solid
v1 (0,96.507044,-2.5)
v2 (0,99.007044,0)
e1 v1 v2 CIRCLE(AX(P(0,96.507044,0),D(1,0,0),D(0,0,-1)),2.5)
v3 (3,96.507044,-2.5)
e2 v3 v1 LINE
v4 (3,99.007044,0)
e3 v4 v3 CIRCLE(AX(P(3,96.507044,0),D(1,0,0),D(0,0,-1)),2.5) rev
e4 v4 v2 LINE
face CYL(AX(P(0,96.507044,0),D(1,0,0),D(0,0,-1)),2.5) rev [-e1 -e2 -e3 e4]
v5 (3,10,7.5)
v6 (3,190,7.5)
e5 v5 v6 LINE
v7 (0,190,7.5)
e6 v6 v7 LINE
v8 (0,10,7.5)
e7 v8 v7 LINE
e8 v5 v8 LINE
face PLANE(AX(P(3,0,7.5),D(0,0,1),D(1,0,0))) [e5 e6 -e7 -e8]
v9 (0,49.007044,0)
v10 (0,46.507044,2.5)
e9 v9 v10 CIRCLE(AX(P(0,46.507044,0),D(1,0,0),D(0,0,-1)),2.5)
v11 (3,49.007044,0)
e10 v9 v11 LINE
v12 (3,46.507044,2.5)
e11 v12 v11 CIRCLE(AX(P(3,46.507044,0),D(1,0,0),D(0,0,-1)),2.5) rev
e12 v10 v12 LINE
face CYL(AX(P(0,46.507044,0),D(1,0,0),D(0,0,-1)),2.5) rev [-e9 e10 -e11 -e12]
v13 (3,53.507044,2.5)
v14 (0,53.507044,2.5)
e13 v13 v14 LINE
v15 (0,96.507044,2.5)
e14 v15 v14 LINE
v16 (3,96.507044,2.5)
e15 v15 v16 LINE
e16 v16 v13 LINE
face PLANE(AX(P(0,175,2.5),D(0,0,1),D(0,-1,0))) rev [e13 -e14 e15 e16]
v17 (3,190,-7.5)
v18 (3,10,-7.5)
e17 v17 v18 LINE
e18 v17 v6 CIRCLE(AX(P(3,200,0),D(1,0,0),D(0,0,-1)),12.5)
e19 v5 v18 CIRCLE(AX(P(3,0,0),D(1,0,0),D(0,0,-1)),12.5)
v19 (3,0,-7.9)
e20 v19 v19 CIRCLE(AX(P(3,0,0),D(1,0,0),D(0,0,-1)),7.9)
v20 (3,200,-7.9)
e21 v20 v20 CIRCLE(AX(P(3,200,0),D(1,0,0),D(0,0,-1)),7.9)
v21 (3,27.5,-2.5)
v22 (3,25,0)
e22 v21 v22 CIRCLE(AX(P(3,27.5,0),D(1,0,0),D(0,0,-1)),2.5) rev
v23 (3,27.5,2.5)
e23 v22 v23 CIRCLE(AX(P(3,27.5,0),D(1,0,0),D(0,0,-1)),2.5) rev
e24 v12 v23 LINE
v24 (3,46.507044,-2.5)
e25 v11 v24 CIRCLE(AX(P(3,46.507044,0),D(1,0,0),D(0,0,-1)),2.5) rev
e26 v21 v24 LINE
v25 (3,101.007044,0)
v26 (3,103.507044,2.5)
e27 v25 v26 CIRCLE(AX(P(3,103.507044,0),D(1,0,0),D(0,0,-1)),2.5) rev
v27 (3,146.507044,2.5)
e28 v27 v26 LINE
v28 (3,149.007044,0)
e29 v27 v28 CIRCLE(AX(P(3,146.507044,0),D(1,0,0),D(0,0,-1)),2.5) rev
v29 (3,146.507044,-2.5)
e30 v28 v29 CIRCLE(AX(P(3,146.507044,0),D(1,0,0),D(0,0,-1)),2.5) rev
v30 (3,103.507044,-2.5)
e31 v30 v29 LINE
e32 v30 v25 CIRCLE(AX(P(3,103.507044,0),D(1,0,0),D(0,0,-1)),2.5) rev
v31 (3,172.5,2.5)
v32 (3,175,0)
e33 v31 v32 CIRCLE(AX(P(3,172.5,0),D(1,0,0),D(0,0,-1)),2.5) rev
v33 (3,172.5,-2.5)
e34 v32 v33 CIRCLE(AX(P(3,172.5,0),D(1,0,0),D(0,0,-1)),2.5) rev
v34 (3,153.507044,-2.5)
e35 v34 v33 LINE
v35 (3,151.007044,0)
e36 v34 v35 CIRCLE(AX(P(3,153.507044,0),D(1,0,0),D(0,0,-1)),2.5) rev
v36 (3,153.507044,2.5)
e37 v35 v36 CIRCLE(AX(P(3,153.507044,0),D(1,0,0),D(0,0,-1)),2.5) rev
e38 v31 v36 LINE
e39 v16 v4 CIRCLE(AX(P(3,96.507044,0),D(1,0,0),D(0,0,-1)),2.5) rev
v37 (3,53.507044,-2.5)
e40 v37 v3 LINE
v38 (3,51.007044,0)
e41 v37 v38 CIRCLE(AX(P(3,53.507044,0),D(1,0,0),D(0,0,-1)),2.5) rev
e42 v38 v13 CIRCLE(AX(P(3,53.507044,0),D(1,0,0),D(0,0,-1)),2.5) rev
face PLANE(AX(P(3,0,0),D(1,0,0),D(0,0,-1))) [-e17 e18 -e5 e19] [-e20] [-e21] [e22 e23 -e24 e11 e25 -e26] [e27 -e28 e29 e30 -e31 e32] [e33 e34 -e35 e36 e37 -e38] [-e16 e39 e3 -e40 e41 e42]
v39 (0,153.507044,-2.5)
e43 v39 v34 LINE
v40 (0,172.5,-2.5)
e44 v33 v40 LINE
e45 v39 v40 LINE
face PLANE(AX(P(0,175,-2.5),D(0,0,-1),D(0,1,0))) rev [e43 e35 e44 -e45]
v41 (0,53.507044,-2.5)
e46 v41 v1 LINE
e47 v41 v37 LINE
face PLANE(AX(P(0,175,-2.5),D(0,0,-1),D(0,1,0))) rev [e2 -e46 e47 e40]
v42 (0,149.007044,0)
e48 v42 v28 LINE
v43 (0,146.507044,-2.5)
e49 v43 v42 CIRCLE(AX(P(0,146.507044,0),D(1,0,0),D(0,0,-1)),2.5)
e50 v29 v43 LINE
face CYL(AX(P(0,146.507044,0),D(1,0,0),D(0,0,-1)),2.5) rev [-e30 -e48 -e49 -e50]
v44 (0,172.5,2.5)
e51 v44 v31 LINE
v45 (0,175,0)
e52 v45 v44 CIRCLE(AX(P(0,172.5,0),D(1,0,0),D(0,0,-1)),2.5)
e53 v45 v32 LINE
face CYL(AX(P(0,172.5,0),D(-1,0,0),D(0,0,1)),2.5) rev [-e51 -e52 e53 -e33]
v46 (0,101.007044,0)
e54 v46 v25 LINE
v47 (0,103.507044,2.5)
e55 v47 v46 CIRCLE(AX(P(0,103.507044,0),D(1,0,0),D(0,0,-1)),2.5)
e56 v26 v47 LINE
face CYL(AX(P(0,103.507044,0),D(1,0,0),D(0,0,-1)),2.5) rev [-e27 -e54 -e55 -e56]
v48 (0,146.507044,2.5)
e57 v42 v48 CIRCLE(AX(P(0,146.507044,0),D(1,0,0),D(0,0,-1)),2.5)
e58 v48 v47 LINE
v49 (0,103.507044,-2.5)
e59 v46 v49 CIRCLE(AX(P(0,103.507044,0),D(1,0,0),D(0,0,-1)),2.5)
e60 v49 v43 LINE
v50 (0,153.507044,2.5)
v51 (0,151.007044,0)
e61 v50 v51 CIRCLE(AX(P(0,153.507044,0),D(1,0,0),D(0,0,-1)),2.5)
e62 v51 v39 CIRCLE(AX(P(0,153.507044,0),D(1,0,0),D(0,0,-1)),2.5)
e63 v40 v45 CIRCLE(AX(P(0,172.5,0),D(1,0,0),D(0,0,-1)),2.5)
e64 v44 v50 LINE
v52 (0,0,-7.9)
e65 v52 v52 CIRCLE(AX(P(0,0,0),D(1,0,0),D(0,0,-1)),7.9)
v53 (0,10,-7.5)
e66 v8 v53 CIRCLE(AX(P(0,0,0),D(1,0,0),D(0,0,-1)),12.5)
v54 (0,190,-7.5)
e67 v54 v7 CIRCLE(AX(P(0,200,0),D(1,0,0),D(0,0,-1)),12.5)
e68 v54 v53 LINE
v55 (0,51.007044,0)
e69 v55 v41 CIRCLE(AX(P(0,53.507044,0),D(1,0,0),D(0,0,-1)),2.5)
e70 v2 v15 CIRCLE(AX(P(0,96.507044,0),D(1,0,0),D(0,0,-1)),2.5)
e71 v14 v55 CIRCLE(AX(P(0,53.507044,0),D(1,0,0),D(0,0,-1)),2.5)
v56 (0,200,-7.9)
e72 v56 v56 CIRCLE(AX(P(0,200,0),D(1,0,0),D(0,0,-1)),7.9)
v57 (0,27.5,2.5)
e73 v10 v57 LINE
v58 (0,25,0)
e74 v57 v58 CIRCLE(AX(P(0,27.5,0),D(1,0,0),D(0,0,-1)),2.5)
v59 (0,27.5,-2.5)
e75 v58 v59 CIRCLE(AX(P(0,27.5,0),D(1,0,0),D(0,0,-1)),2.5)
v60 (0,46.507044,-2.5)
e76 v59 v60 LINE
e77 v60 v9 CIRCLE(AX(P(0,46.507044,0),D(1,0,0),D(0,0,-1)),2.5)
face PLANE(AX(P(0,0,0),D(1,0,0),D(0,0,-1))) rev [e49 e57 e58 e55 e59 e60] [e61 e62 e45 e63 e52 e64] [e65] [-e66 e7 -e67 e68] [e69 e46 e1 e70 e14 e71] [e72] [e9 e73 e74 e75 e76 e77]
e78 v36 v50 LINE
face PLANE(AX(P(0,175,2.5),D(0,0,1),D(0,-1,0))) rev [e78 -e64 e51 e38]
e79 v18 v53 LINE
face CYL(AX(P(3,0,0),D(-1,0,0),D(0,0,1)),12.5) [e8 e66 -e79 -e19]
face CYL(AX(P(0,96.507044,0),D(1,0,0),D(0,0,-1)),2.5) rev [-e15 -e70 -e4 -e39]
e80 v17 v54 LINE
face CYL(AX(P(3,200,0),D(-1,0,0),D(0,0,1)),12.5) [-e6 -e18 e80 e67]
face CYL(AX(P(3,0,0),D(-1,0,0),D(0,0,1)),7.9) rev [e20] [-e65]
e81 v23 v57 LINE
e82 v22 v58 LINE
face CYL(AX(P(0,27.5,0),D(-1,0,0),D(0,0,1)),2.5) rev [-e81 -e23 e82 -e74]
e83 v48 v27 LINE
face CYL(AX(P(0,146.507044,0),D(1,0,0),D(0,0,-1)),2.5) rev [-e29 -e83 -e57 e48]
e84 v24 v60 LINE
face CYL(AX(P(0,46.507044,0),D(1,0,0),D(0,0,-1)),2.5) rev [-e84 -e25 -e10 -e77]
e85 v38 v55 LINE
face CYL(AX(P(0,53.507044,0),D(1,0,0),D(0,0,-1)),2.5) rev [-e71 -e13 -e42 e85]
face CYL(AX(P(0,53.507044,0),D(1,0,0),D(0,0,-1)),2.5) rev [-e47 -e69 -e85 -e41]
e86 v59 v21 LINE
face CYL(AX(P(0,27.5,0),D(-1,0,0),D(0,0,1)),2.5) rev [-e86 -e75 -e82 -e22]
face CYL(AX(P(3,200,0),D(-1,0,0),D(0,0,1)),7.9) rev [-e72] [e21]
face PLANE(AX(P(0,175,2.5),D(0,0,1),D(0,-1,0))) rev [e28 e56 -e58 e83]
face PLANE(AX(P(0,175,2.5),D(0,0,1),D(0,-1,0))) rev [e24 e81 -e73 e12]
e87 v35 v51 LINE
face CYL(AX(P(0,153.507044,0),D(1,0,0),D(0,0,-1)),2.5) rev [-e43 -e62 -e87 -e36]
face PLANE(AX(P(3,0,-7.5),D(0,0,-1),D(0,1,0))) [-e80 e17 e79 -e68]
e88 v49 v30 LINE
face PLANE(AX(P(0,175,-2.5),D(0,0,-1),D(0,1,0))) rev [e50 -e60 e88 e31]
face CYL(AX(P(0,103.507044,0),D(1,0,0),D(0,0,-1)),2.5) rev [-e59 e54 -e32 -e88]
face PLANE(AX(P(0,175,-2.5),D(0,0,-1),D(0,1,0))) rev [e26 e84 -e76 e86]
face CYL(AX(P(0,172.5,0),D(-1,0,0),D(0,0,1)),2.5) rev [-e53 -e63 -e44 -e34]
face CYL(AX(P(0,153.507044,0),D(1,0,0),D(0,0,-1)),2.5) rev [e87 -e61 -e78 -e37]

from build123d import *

# Parameters (mm, degrees)
SKETCH1_R           = 7.9
BOSS_EXTRUDE1_DEPTH = 3
SKETCH3_W           = 5
SKETCH3_H           = 150
CUT_EXTRUDE2_DEPTH  = 213.888468452
FILLET2_R           = 2.5
SKETCH4_W           = 5
SKETCH4_H           = 2
BOSS_EXTRUDE2_DEPTH = 3
FILLET3_R           = 2.5


with BuildPart() as part:
    # Sketch1 → Boss-Extrude1 (new body)
    with BuildSketch(Plane(origin=(0, 0, 0), x_dir=(0, 0, -1), z_dir=(1, 0, 0))):
        with BuildLine():
            Line((7.5, 10), (7.5, 190))
            ThreePointArc((7.5, 190), (0, 212.5), (-7.5, 190))
            Line((-7.5, 190), (-7.5, 10))
            ThreePointArc((-7.5, 10), (0, -12.5), (7.5, 10))
        make_face()
        Circle(SKETCH1_R, mode=Mode.SUBTRACT)
        with Locations((0, 200)):
            Circle(SKETCH1_R, mode=Mode.SUBTRACT)
    extrude(amount=BOSS_EXTRUDE1_DEPTH)

    # Sketch3 → Cut-Extrude2 (cut, through all)
    with BuildSketch(Plane(origin=(3, 0, 0), x_dir=(0, 0, -1), z_dir=(1, 0, 0))):
        with Locations((0, 100)):
            Rectangle(SKETCH3_W, SKETCH3_H)
    extrude(amount=-CUT_EXTRUDE2_DEPTH, mode=Mode.SUBTRACT)

    # Fillet2
    fillet2_edges = [part.edges().sort_by_distance(p)[0] for p in [
        (1.5, 175, 2.5),
        (1.5, 175, -2.5),
        (1.5, 25, 2.5),
        (1.5, 25, -2.5),
    ]]
    fillet(fillet2_edges, radius=FILLET2_R - 0.0001)  # a hair under: the kernel refuses the full size

    # Sketch4 → Boss-Extrude2 (add)
    with BuildSketch(Plane(origin=(3, 0, 0), x_dir=(0, 0, -1), z_dir=(1, 0, 0))):
        with Locations((0, 100.007044109)):
            Rectangle(SKETCH4_W, SKETCH4_H)
        with Locations((0, 50.007044109)):
            Rectangle(SKETCH4_W, SKETCH4_H)
        with Locations((0, 150.007044109)):
            Rectangle(SKETCH4_W, SKETCH4_H)
    extrude(amount=-BOSS_EXTRUDE2_DEPTH)

    # Fillet3
    fillet3_edges = [part.edges().sort_by_distance(p)[0] for p in [
        (1.5, 101.007044109, -2.5),
        (1.5, 101.007044109, 2.5),
        (1.5, 51.007044109, 2.5),
        (1.5, 51.007044109, -2.5),
        (1.5, 49.007044109, 2.5),
        (1.5, 49.007044109, -2.5),
        (1.5, 99.007044109, -2.5),
        (1.5, 99.007044109, 2.5),
        (1.5, 149.007044109, 2.5),
        (1.5, 149.007044109, -2.5),
        (1.5, 151.007044109, 2.5),
        (1.5, 151.007044109, -2.5),
    ]]
    fillet(fillet3_edges, radius=FILLET3_R - 0.0001)  # a hair under: the kernel refuses the full size


solid = part.part
